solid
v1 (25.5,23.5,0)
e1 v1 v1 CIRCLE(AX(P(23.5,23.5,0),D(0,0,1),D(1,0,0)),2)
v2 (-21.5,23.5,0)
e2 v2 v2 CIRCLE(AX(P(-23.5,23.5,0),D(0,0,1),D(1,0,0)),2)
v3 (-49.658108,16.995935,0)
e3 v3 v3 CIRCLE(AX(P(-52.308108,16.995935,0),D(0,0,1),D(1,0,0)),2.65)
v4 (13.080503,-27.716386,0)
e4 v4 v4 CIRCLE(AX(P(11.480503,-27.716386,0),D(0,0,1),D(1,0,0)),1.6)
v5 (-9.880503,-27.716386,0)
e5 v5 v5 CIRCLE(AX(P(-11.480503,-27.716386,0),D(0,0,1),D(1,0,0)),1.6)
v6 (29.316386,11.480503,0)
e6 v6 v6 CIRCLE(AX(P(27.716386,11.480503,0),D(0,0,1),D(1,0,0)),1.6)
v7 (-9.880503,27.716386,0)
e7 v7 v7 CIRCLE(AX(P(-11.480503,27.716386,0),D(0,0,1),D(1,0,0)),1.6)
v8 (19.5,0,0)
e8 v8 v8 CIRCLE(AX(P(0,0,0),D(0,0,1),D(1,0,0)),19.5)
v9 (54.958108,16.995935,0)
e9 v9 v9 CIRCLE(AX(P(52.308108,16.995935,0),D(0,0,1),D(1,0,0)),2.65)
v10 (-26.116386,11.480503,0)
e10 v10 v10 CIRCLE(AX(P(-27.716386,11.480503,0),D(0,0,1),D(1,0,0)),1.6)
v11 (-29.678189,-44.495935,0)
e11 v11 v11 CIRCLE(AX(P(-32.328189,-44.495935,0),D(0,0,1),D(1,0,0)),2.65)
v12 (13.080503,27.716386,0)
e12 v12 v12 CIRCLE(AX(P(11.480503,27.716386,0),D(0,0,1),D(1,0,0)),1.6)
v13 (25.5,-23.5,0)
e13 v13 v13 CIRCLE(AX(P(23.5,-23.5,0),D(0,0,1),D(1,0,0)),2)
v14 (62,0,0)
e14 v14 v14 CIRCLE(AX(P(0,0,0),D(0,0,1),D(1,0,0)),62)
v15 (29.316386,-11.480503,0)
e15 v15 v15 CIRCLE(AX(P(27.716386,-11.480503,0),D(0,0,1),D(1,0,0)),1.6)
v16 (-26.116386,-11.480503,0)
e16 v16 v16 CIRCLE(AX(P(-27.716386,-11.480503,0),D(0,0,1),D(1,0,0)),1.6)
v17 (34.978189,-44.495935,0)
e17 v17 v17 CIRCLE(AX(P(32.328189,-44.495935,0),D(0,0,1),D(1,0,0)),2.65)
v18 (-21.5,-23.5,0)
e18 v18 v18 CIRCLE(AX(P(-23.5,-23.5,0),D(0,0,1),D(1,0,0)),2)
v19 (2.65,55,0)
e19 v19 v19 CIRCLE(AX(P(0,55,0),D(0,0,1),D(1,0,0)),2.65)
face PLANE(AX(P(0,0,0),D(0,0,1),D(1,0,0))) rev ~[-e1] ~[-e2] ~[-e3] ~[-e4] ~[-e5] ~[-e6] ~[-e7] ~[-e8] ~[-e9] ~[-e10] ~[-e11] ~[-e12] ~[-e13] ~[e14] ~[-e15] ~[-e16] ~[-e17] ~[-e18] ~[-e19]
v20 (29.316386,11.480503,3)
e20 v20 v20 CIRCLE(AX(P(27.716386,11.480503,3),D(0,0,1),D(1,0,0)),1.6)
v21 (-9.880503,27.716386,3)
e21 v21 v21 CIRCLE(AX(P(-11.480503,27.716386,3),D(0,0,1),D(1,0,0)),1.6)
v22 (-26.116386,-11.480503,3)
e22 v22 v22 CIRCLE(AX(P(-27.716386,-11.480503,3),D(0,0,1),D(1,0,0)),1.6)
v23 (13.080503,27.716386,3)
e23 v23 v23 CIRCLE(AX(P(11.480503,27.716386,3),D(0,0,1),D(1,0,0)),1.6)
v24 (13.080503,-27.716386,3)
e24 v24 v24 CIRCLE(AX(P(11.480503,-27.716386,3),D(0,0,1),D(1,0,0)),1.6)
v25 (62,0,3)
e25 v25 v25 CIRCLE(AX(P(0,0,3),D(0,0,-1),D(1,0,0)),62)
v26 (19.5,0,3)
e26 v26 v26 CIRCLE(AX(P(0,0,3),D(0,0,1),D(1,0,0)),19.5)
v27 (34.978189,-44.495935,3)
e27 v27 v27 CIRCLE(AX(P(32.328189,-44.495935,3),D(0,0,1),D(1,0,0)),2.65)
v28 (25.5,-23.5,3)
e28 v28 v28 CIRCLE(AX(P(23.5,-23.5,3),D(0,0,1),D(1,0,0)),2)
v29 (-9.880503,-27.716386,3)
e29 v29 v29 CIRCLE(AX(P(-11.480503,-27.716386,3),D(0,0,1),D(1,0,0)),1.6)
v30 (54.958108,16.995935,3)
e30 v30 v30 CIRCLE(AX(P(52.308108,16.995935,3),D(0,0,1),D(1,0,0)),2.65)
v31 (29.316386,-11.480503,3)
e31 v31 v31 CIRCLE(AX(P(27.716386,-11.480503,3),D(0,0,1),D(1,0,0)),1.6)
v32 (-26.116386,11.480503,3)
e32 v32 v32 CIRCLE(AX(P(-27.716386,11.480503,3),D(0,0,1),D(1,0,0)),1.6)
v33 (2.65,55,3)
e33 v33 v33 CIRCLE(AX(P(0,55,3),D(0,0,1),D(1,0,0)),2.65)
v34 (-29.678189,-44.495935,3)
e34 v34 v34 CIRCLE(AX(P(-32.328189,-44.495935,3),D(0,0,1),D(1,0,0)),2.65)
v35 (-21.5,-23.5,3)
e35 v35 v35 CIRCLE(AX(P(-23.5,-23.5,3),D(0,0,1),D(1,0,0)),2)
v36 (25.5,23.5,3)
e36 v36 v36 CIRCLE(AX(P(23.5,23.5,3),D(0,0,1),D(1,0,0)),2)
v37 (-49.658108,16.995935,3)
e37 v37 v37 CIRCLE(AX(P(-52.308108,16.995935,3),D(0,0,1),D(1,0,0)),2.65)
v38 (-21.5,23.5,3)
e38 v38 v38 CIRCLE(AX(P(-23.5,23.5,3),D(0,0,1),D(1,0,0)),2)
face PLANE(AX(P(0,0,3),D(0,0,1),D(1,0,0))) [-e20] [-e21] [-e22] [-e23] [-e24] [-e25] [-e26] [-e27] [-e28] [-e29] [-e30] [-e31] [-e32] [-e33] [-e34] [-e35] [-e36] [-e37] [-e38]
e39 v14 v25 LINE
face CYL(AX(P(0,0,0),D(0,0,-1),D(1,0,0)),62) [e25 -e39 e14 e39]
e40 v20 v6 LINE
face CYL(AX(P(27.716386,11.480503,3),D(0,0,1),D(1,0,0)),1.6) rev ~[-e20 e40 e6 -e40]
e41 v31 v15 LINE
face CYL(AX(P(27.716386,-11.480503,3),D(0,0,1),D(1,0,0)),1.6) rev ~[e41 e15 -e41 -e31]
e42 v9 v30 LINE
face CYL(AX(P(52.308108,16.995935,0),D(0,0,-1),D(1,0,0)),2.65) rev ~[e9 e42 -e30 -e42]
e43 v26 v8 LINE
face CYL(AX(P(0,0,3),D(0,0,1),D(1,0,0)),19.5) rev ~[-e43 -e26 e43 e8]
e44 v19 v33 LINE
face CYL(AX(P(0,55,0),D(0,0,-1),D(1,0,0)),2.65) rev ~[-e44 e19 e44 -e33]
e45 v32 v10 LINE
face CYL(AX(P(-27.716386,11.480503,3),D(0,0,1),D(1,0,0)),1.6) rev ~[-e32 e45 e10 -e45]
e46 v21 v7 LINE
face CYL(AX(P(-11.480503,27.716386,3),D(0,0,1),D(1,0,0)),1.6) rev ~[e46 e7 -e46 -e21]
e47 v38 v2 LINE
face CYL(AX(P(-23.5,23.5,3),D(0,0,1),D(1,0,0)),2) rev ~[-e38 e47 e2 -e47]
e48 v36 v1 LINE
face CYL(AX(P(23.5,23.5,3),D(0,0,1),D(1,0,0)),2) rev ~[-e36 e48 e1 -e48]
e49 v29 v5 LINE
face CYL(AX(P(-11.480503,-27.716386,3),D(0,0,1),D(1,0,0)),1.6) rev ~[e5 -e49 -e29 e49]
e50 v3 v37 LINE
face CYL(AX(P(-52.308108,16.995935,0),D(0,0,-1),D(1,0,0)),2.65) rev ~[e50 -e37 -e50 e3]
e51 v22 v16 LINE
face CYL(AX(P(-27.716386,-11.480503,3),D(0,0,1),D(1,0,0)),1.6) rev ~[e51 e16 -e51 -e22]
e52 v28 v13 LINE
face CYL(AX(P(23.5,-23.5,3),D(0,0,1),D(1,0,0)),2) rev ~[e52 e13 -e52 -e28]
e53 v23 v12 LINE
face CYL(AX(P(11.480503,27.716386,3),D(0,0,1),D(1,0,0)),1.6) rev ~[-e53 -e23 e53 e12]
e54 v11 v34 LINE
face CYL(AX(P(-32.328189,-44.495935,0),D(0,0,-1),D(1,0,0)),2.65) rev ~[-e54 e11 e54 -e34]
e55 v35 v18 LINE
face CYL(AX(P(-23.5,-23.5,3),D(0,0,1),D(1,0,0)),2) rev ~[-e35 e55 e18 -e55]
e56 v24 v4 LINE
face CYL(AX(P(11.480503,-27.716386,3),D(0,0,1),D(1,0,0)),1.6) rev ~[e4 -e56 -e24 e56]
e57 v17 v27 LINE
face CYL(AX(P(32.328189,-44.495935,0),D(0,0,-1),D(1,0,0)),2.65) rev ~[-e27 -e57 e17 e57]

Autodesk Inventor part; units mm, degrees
ref_plane "YZ Plane" through (0, 0, 0) normal (1, 0, 0) x (0, 1, 0)
ref_plane "XZ Plane" through (0, 0, 0) normal (0, 1, 0) x (-1, 0, 0)
ref_plane "XY Plane" through (0, 0, 0) normal (0, 0, 1) x (1, 0, 0)
sketch "Sketch1" plane through (0, 0, 0) normal (0, 0, 1) x (1, 0, 0)
  circle A0 centre (0, 55) radius 2.65
  arc A1 (62, 0) -> (-62, 0) centre (0, 0) ccw
  line L0 (-62, 0) -> (-62, -80)
  line L1 (-62, -80) -> (62, -80)
  line L2 (62, -80) -> (62, 0)
  circle A2 centre (0, 0) radius 47.5 construction
  circle A3 centre (0, 0) radius 55 construction
  line L3 (0, 55) -> (0, 0) construction
  circle A4 centre (-52.308108, 16.995935) radius 2.65
  circle A5 centre (-32.328189, -44.495935) radius 2.65
  circle A6 centre (32.328189, -44.495935) radius 2.65
  circle A7 centre (52.308108, 16.995935) radius 2.65
  dimension "d23" = 110
  dimension "d24" = 95
  dimension "d25" = 62
  dimension "d26" = 80
  dimension "d27" = 5.3
  dimension "d30" = 360
extrude "Extrusion1" add sketch "Sketch1" along normal blind 3
sketch "Sketch2" plane through (0, 0, 3) normal (0, 0, 1) x (1, 0, 0)
  circle A0 centre (0, 0) radius 19.5
  line L0 (-23.5, -23.5) -> (23.5, -23.5) construction
  line L1 (23.5, -23.5) -> (23.5, 23.5) construction
  line L2 (23.5, 23.5) -> (-23.5, 23.5) construction
  line L3 (-23.5, 23.5) -> (-23.5, -23.5) construction
  line L4 (-23.5, -23.5) -> (23.5, 23.5) construction
  line L5 (23.5, -23.5) -> (-23.5, 23.5) construction
  circle A1 centre (-23.5, 23.5) radius 2
  circle A2 centre (23.5, 23.5) radius 2
  circle A3 centre (23.5, -23.5) radius 2
  circle A4 centre (-23.5, -23.5) radius 2
  dimension "d2" = 39
  dimension "d3" = 47
  dimension "d4" = 4
extrude "Extrusion2" cut sketch "Sketch2" against normal through all
sketch "Sketch3" plane through (0, 0, 3) normal (0, 0, 1) x (1, 0, 0)
  arc A0 (62, 0) -> (-62, 0) centre (0, 0) ccw
  circle A1 centre (0, 0) radius 62
  circle A2 centre (0, 0) radius 147.62847
  point P0 (62, 0)
sketch "Sketch3 outline for Extrusion3" plane through (0, 0, 3) normal (0, 0, 1) x (1, 0, 0)
  circle A0 centre (0, 0) radius 147.62847
  arc A1 (62, 0) -> (-62, 0) centre (0, 0) cw
  arc A2 (-62, 0) -> (62, 0) centre (0, 0) cw
extrude "Extrusion3" cut sketch "Sketch3 outline for Extrusion3" against normal through all
sketch "Sketch4" plane through (0, 0, 3) normal (0, 0, 1) x (1, 0, 0)
  circle A0 centre (0, 0) radius 30 construction
  circle A1 centre (-27.716386, 11.480503) radius 1.6
  line L0 (-27.716386, 11.480503) -> (0, 0) construction
  line L1 (-27.716386, -11.480503) -> (0, 0) construction
  circle A2 centre (-27.716386, -11.480503) radius 1.6
  line L2 (-11.480503, -27.716386) -> (0, 0) construction
  circle A3 centre (-11.480503, -27.716386) radius 1.6
  line L3 (11.480503, -27.716386) -> (0, 0) construction
  circle A4 centre (11.480503, -27.716386) radius 1.6
  line L4 (27.716386, -11.480503) -> (0, 0) construction
  circle A5 centre (27.716386, -11.480503) radius 1.6
  line L5 (27.716386, 11.480503) -> (0, 0) construction
  circle A6 centre (27.716386, 11.480503) radius 1.6
  line L6 (11.480503, 27.716386) -> (0, 0) construction
  circle A7 centre (11.480503, 27.716386) radius 1.6
  line L7 (-11.480503, 27.716386) -> (0, 0) construction
  circle A8 centre (-11.480503, 27.716386) radius 1.6
  line L8 (0, 0) -> (-27.716386, 0) construction
  line L9 (-27.716386, 0) -> (-27.716386, 11.480503) construction
  line L10 (-27.716386, 0) -> (-27.716386, -11.480503) construction
  dimension "d9" = 60
  dimension "d10" = 3.2
  dimension "d13" = 360
extrude "Extrusion4" cut sketch "Sketch4" against normal through all
properties part number "J0_motorbracket"
